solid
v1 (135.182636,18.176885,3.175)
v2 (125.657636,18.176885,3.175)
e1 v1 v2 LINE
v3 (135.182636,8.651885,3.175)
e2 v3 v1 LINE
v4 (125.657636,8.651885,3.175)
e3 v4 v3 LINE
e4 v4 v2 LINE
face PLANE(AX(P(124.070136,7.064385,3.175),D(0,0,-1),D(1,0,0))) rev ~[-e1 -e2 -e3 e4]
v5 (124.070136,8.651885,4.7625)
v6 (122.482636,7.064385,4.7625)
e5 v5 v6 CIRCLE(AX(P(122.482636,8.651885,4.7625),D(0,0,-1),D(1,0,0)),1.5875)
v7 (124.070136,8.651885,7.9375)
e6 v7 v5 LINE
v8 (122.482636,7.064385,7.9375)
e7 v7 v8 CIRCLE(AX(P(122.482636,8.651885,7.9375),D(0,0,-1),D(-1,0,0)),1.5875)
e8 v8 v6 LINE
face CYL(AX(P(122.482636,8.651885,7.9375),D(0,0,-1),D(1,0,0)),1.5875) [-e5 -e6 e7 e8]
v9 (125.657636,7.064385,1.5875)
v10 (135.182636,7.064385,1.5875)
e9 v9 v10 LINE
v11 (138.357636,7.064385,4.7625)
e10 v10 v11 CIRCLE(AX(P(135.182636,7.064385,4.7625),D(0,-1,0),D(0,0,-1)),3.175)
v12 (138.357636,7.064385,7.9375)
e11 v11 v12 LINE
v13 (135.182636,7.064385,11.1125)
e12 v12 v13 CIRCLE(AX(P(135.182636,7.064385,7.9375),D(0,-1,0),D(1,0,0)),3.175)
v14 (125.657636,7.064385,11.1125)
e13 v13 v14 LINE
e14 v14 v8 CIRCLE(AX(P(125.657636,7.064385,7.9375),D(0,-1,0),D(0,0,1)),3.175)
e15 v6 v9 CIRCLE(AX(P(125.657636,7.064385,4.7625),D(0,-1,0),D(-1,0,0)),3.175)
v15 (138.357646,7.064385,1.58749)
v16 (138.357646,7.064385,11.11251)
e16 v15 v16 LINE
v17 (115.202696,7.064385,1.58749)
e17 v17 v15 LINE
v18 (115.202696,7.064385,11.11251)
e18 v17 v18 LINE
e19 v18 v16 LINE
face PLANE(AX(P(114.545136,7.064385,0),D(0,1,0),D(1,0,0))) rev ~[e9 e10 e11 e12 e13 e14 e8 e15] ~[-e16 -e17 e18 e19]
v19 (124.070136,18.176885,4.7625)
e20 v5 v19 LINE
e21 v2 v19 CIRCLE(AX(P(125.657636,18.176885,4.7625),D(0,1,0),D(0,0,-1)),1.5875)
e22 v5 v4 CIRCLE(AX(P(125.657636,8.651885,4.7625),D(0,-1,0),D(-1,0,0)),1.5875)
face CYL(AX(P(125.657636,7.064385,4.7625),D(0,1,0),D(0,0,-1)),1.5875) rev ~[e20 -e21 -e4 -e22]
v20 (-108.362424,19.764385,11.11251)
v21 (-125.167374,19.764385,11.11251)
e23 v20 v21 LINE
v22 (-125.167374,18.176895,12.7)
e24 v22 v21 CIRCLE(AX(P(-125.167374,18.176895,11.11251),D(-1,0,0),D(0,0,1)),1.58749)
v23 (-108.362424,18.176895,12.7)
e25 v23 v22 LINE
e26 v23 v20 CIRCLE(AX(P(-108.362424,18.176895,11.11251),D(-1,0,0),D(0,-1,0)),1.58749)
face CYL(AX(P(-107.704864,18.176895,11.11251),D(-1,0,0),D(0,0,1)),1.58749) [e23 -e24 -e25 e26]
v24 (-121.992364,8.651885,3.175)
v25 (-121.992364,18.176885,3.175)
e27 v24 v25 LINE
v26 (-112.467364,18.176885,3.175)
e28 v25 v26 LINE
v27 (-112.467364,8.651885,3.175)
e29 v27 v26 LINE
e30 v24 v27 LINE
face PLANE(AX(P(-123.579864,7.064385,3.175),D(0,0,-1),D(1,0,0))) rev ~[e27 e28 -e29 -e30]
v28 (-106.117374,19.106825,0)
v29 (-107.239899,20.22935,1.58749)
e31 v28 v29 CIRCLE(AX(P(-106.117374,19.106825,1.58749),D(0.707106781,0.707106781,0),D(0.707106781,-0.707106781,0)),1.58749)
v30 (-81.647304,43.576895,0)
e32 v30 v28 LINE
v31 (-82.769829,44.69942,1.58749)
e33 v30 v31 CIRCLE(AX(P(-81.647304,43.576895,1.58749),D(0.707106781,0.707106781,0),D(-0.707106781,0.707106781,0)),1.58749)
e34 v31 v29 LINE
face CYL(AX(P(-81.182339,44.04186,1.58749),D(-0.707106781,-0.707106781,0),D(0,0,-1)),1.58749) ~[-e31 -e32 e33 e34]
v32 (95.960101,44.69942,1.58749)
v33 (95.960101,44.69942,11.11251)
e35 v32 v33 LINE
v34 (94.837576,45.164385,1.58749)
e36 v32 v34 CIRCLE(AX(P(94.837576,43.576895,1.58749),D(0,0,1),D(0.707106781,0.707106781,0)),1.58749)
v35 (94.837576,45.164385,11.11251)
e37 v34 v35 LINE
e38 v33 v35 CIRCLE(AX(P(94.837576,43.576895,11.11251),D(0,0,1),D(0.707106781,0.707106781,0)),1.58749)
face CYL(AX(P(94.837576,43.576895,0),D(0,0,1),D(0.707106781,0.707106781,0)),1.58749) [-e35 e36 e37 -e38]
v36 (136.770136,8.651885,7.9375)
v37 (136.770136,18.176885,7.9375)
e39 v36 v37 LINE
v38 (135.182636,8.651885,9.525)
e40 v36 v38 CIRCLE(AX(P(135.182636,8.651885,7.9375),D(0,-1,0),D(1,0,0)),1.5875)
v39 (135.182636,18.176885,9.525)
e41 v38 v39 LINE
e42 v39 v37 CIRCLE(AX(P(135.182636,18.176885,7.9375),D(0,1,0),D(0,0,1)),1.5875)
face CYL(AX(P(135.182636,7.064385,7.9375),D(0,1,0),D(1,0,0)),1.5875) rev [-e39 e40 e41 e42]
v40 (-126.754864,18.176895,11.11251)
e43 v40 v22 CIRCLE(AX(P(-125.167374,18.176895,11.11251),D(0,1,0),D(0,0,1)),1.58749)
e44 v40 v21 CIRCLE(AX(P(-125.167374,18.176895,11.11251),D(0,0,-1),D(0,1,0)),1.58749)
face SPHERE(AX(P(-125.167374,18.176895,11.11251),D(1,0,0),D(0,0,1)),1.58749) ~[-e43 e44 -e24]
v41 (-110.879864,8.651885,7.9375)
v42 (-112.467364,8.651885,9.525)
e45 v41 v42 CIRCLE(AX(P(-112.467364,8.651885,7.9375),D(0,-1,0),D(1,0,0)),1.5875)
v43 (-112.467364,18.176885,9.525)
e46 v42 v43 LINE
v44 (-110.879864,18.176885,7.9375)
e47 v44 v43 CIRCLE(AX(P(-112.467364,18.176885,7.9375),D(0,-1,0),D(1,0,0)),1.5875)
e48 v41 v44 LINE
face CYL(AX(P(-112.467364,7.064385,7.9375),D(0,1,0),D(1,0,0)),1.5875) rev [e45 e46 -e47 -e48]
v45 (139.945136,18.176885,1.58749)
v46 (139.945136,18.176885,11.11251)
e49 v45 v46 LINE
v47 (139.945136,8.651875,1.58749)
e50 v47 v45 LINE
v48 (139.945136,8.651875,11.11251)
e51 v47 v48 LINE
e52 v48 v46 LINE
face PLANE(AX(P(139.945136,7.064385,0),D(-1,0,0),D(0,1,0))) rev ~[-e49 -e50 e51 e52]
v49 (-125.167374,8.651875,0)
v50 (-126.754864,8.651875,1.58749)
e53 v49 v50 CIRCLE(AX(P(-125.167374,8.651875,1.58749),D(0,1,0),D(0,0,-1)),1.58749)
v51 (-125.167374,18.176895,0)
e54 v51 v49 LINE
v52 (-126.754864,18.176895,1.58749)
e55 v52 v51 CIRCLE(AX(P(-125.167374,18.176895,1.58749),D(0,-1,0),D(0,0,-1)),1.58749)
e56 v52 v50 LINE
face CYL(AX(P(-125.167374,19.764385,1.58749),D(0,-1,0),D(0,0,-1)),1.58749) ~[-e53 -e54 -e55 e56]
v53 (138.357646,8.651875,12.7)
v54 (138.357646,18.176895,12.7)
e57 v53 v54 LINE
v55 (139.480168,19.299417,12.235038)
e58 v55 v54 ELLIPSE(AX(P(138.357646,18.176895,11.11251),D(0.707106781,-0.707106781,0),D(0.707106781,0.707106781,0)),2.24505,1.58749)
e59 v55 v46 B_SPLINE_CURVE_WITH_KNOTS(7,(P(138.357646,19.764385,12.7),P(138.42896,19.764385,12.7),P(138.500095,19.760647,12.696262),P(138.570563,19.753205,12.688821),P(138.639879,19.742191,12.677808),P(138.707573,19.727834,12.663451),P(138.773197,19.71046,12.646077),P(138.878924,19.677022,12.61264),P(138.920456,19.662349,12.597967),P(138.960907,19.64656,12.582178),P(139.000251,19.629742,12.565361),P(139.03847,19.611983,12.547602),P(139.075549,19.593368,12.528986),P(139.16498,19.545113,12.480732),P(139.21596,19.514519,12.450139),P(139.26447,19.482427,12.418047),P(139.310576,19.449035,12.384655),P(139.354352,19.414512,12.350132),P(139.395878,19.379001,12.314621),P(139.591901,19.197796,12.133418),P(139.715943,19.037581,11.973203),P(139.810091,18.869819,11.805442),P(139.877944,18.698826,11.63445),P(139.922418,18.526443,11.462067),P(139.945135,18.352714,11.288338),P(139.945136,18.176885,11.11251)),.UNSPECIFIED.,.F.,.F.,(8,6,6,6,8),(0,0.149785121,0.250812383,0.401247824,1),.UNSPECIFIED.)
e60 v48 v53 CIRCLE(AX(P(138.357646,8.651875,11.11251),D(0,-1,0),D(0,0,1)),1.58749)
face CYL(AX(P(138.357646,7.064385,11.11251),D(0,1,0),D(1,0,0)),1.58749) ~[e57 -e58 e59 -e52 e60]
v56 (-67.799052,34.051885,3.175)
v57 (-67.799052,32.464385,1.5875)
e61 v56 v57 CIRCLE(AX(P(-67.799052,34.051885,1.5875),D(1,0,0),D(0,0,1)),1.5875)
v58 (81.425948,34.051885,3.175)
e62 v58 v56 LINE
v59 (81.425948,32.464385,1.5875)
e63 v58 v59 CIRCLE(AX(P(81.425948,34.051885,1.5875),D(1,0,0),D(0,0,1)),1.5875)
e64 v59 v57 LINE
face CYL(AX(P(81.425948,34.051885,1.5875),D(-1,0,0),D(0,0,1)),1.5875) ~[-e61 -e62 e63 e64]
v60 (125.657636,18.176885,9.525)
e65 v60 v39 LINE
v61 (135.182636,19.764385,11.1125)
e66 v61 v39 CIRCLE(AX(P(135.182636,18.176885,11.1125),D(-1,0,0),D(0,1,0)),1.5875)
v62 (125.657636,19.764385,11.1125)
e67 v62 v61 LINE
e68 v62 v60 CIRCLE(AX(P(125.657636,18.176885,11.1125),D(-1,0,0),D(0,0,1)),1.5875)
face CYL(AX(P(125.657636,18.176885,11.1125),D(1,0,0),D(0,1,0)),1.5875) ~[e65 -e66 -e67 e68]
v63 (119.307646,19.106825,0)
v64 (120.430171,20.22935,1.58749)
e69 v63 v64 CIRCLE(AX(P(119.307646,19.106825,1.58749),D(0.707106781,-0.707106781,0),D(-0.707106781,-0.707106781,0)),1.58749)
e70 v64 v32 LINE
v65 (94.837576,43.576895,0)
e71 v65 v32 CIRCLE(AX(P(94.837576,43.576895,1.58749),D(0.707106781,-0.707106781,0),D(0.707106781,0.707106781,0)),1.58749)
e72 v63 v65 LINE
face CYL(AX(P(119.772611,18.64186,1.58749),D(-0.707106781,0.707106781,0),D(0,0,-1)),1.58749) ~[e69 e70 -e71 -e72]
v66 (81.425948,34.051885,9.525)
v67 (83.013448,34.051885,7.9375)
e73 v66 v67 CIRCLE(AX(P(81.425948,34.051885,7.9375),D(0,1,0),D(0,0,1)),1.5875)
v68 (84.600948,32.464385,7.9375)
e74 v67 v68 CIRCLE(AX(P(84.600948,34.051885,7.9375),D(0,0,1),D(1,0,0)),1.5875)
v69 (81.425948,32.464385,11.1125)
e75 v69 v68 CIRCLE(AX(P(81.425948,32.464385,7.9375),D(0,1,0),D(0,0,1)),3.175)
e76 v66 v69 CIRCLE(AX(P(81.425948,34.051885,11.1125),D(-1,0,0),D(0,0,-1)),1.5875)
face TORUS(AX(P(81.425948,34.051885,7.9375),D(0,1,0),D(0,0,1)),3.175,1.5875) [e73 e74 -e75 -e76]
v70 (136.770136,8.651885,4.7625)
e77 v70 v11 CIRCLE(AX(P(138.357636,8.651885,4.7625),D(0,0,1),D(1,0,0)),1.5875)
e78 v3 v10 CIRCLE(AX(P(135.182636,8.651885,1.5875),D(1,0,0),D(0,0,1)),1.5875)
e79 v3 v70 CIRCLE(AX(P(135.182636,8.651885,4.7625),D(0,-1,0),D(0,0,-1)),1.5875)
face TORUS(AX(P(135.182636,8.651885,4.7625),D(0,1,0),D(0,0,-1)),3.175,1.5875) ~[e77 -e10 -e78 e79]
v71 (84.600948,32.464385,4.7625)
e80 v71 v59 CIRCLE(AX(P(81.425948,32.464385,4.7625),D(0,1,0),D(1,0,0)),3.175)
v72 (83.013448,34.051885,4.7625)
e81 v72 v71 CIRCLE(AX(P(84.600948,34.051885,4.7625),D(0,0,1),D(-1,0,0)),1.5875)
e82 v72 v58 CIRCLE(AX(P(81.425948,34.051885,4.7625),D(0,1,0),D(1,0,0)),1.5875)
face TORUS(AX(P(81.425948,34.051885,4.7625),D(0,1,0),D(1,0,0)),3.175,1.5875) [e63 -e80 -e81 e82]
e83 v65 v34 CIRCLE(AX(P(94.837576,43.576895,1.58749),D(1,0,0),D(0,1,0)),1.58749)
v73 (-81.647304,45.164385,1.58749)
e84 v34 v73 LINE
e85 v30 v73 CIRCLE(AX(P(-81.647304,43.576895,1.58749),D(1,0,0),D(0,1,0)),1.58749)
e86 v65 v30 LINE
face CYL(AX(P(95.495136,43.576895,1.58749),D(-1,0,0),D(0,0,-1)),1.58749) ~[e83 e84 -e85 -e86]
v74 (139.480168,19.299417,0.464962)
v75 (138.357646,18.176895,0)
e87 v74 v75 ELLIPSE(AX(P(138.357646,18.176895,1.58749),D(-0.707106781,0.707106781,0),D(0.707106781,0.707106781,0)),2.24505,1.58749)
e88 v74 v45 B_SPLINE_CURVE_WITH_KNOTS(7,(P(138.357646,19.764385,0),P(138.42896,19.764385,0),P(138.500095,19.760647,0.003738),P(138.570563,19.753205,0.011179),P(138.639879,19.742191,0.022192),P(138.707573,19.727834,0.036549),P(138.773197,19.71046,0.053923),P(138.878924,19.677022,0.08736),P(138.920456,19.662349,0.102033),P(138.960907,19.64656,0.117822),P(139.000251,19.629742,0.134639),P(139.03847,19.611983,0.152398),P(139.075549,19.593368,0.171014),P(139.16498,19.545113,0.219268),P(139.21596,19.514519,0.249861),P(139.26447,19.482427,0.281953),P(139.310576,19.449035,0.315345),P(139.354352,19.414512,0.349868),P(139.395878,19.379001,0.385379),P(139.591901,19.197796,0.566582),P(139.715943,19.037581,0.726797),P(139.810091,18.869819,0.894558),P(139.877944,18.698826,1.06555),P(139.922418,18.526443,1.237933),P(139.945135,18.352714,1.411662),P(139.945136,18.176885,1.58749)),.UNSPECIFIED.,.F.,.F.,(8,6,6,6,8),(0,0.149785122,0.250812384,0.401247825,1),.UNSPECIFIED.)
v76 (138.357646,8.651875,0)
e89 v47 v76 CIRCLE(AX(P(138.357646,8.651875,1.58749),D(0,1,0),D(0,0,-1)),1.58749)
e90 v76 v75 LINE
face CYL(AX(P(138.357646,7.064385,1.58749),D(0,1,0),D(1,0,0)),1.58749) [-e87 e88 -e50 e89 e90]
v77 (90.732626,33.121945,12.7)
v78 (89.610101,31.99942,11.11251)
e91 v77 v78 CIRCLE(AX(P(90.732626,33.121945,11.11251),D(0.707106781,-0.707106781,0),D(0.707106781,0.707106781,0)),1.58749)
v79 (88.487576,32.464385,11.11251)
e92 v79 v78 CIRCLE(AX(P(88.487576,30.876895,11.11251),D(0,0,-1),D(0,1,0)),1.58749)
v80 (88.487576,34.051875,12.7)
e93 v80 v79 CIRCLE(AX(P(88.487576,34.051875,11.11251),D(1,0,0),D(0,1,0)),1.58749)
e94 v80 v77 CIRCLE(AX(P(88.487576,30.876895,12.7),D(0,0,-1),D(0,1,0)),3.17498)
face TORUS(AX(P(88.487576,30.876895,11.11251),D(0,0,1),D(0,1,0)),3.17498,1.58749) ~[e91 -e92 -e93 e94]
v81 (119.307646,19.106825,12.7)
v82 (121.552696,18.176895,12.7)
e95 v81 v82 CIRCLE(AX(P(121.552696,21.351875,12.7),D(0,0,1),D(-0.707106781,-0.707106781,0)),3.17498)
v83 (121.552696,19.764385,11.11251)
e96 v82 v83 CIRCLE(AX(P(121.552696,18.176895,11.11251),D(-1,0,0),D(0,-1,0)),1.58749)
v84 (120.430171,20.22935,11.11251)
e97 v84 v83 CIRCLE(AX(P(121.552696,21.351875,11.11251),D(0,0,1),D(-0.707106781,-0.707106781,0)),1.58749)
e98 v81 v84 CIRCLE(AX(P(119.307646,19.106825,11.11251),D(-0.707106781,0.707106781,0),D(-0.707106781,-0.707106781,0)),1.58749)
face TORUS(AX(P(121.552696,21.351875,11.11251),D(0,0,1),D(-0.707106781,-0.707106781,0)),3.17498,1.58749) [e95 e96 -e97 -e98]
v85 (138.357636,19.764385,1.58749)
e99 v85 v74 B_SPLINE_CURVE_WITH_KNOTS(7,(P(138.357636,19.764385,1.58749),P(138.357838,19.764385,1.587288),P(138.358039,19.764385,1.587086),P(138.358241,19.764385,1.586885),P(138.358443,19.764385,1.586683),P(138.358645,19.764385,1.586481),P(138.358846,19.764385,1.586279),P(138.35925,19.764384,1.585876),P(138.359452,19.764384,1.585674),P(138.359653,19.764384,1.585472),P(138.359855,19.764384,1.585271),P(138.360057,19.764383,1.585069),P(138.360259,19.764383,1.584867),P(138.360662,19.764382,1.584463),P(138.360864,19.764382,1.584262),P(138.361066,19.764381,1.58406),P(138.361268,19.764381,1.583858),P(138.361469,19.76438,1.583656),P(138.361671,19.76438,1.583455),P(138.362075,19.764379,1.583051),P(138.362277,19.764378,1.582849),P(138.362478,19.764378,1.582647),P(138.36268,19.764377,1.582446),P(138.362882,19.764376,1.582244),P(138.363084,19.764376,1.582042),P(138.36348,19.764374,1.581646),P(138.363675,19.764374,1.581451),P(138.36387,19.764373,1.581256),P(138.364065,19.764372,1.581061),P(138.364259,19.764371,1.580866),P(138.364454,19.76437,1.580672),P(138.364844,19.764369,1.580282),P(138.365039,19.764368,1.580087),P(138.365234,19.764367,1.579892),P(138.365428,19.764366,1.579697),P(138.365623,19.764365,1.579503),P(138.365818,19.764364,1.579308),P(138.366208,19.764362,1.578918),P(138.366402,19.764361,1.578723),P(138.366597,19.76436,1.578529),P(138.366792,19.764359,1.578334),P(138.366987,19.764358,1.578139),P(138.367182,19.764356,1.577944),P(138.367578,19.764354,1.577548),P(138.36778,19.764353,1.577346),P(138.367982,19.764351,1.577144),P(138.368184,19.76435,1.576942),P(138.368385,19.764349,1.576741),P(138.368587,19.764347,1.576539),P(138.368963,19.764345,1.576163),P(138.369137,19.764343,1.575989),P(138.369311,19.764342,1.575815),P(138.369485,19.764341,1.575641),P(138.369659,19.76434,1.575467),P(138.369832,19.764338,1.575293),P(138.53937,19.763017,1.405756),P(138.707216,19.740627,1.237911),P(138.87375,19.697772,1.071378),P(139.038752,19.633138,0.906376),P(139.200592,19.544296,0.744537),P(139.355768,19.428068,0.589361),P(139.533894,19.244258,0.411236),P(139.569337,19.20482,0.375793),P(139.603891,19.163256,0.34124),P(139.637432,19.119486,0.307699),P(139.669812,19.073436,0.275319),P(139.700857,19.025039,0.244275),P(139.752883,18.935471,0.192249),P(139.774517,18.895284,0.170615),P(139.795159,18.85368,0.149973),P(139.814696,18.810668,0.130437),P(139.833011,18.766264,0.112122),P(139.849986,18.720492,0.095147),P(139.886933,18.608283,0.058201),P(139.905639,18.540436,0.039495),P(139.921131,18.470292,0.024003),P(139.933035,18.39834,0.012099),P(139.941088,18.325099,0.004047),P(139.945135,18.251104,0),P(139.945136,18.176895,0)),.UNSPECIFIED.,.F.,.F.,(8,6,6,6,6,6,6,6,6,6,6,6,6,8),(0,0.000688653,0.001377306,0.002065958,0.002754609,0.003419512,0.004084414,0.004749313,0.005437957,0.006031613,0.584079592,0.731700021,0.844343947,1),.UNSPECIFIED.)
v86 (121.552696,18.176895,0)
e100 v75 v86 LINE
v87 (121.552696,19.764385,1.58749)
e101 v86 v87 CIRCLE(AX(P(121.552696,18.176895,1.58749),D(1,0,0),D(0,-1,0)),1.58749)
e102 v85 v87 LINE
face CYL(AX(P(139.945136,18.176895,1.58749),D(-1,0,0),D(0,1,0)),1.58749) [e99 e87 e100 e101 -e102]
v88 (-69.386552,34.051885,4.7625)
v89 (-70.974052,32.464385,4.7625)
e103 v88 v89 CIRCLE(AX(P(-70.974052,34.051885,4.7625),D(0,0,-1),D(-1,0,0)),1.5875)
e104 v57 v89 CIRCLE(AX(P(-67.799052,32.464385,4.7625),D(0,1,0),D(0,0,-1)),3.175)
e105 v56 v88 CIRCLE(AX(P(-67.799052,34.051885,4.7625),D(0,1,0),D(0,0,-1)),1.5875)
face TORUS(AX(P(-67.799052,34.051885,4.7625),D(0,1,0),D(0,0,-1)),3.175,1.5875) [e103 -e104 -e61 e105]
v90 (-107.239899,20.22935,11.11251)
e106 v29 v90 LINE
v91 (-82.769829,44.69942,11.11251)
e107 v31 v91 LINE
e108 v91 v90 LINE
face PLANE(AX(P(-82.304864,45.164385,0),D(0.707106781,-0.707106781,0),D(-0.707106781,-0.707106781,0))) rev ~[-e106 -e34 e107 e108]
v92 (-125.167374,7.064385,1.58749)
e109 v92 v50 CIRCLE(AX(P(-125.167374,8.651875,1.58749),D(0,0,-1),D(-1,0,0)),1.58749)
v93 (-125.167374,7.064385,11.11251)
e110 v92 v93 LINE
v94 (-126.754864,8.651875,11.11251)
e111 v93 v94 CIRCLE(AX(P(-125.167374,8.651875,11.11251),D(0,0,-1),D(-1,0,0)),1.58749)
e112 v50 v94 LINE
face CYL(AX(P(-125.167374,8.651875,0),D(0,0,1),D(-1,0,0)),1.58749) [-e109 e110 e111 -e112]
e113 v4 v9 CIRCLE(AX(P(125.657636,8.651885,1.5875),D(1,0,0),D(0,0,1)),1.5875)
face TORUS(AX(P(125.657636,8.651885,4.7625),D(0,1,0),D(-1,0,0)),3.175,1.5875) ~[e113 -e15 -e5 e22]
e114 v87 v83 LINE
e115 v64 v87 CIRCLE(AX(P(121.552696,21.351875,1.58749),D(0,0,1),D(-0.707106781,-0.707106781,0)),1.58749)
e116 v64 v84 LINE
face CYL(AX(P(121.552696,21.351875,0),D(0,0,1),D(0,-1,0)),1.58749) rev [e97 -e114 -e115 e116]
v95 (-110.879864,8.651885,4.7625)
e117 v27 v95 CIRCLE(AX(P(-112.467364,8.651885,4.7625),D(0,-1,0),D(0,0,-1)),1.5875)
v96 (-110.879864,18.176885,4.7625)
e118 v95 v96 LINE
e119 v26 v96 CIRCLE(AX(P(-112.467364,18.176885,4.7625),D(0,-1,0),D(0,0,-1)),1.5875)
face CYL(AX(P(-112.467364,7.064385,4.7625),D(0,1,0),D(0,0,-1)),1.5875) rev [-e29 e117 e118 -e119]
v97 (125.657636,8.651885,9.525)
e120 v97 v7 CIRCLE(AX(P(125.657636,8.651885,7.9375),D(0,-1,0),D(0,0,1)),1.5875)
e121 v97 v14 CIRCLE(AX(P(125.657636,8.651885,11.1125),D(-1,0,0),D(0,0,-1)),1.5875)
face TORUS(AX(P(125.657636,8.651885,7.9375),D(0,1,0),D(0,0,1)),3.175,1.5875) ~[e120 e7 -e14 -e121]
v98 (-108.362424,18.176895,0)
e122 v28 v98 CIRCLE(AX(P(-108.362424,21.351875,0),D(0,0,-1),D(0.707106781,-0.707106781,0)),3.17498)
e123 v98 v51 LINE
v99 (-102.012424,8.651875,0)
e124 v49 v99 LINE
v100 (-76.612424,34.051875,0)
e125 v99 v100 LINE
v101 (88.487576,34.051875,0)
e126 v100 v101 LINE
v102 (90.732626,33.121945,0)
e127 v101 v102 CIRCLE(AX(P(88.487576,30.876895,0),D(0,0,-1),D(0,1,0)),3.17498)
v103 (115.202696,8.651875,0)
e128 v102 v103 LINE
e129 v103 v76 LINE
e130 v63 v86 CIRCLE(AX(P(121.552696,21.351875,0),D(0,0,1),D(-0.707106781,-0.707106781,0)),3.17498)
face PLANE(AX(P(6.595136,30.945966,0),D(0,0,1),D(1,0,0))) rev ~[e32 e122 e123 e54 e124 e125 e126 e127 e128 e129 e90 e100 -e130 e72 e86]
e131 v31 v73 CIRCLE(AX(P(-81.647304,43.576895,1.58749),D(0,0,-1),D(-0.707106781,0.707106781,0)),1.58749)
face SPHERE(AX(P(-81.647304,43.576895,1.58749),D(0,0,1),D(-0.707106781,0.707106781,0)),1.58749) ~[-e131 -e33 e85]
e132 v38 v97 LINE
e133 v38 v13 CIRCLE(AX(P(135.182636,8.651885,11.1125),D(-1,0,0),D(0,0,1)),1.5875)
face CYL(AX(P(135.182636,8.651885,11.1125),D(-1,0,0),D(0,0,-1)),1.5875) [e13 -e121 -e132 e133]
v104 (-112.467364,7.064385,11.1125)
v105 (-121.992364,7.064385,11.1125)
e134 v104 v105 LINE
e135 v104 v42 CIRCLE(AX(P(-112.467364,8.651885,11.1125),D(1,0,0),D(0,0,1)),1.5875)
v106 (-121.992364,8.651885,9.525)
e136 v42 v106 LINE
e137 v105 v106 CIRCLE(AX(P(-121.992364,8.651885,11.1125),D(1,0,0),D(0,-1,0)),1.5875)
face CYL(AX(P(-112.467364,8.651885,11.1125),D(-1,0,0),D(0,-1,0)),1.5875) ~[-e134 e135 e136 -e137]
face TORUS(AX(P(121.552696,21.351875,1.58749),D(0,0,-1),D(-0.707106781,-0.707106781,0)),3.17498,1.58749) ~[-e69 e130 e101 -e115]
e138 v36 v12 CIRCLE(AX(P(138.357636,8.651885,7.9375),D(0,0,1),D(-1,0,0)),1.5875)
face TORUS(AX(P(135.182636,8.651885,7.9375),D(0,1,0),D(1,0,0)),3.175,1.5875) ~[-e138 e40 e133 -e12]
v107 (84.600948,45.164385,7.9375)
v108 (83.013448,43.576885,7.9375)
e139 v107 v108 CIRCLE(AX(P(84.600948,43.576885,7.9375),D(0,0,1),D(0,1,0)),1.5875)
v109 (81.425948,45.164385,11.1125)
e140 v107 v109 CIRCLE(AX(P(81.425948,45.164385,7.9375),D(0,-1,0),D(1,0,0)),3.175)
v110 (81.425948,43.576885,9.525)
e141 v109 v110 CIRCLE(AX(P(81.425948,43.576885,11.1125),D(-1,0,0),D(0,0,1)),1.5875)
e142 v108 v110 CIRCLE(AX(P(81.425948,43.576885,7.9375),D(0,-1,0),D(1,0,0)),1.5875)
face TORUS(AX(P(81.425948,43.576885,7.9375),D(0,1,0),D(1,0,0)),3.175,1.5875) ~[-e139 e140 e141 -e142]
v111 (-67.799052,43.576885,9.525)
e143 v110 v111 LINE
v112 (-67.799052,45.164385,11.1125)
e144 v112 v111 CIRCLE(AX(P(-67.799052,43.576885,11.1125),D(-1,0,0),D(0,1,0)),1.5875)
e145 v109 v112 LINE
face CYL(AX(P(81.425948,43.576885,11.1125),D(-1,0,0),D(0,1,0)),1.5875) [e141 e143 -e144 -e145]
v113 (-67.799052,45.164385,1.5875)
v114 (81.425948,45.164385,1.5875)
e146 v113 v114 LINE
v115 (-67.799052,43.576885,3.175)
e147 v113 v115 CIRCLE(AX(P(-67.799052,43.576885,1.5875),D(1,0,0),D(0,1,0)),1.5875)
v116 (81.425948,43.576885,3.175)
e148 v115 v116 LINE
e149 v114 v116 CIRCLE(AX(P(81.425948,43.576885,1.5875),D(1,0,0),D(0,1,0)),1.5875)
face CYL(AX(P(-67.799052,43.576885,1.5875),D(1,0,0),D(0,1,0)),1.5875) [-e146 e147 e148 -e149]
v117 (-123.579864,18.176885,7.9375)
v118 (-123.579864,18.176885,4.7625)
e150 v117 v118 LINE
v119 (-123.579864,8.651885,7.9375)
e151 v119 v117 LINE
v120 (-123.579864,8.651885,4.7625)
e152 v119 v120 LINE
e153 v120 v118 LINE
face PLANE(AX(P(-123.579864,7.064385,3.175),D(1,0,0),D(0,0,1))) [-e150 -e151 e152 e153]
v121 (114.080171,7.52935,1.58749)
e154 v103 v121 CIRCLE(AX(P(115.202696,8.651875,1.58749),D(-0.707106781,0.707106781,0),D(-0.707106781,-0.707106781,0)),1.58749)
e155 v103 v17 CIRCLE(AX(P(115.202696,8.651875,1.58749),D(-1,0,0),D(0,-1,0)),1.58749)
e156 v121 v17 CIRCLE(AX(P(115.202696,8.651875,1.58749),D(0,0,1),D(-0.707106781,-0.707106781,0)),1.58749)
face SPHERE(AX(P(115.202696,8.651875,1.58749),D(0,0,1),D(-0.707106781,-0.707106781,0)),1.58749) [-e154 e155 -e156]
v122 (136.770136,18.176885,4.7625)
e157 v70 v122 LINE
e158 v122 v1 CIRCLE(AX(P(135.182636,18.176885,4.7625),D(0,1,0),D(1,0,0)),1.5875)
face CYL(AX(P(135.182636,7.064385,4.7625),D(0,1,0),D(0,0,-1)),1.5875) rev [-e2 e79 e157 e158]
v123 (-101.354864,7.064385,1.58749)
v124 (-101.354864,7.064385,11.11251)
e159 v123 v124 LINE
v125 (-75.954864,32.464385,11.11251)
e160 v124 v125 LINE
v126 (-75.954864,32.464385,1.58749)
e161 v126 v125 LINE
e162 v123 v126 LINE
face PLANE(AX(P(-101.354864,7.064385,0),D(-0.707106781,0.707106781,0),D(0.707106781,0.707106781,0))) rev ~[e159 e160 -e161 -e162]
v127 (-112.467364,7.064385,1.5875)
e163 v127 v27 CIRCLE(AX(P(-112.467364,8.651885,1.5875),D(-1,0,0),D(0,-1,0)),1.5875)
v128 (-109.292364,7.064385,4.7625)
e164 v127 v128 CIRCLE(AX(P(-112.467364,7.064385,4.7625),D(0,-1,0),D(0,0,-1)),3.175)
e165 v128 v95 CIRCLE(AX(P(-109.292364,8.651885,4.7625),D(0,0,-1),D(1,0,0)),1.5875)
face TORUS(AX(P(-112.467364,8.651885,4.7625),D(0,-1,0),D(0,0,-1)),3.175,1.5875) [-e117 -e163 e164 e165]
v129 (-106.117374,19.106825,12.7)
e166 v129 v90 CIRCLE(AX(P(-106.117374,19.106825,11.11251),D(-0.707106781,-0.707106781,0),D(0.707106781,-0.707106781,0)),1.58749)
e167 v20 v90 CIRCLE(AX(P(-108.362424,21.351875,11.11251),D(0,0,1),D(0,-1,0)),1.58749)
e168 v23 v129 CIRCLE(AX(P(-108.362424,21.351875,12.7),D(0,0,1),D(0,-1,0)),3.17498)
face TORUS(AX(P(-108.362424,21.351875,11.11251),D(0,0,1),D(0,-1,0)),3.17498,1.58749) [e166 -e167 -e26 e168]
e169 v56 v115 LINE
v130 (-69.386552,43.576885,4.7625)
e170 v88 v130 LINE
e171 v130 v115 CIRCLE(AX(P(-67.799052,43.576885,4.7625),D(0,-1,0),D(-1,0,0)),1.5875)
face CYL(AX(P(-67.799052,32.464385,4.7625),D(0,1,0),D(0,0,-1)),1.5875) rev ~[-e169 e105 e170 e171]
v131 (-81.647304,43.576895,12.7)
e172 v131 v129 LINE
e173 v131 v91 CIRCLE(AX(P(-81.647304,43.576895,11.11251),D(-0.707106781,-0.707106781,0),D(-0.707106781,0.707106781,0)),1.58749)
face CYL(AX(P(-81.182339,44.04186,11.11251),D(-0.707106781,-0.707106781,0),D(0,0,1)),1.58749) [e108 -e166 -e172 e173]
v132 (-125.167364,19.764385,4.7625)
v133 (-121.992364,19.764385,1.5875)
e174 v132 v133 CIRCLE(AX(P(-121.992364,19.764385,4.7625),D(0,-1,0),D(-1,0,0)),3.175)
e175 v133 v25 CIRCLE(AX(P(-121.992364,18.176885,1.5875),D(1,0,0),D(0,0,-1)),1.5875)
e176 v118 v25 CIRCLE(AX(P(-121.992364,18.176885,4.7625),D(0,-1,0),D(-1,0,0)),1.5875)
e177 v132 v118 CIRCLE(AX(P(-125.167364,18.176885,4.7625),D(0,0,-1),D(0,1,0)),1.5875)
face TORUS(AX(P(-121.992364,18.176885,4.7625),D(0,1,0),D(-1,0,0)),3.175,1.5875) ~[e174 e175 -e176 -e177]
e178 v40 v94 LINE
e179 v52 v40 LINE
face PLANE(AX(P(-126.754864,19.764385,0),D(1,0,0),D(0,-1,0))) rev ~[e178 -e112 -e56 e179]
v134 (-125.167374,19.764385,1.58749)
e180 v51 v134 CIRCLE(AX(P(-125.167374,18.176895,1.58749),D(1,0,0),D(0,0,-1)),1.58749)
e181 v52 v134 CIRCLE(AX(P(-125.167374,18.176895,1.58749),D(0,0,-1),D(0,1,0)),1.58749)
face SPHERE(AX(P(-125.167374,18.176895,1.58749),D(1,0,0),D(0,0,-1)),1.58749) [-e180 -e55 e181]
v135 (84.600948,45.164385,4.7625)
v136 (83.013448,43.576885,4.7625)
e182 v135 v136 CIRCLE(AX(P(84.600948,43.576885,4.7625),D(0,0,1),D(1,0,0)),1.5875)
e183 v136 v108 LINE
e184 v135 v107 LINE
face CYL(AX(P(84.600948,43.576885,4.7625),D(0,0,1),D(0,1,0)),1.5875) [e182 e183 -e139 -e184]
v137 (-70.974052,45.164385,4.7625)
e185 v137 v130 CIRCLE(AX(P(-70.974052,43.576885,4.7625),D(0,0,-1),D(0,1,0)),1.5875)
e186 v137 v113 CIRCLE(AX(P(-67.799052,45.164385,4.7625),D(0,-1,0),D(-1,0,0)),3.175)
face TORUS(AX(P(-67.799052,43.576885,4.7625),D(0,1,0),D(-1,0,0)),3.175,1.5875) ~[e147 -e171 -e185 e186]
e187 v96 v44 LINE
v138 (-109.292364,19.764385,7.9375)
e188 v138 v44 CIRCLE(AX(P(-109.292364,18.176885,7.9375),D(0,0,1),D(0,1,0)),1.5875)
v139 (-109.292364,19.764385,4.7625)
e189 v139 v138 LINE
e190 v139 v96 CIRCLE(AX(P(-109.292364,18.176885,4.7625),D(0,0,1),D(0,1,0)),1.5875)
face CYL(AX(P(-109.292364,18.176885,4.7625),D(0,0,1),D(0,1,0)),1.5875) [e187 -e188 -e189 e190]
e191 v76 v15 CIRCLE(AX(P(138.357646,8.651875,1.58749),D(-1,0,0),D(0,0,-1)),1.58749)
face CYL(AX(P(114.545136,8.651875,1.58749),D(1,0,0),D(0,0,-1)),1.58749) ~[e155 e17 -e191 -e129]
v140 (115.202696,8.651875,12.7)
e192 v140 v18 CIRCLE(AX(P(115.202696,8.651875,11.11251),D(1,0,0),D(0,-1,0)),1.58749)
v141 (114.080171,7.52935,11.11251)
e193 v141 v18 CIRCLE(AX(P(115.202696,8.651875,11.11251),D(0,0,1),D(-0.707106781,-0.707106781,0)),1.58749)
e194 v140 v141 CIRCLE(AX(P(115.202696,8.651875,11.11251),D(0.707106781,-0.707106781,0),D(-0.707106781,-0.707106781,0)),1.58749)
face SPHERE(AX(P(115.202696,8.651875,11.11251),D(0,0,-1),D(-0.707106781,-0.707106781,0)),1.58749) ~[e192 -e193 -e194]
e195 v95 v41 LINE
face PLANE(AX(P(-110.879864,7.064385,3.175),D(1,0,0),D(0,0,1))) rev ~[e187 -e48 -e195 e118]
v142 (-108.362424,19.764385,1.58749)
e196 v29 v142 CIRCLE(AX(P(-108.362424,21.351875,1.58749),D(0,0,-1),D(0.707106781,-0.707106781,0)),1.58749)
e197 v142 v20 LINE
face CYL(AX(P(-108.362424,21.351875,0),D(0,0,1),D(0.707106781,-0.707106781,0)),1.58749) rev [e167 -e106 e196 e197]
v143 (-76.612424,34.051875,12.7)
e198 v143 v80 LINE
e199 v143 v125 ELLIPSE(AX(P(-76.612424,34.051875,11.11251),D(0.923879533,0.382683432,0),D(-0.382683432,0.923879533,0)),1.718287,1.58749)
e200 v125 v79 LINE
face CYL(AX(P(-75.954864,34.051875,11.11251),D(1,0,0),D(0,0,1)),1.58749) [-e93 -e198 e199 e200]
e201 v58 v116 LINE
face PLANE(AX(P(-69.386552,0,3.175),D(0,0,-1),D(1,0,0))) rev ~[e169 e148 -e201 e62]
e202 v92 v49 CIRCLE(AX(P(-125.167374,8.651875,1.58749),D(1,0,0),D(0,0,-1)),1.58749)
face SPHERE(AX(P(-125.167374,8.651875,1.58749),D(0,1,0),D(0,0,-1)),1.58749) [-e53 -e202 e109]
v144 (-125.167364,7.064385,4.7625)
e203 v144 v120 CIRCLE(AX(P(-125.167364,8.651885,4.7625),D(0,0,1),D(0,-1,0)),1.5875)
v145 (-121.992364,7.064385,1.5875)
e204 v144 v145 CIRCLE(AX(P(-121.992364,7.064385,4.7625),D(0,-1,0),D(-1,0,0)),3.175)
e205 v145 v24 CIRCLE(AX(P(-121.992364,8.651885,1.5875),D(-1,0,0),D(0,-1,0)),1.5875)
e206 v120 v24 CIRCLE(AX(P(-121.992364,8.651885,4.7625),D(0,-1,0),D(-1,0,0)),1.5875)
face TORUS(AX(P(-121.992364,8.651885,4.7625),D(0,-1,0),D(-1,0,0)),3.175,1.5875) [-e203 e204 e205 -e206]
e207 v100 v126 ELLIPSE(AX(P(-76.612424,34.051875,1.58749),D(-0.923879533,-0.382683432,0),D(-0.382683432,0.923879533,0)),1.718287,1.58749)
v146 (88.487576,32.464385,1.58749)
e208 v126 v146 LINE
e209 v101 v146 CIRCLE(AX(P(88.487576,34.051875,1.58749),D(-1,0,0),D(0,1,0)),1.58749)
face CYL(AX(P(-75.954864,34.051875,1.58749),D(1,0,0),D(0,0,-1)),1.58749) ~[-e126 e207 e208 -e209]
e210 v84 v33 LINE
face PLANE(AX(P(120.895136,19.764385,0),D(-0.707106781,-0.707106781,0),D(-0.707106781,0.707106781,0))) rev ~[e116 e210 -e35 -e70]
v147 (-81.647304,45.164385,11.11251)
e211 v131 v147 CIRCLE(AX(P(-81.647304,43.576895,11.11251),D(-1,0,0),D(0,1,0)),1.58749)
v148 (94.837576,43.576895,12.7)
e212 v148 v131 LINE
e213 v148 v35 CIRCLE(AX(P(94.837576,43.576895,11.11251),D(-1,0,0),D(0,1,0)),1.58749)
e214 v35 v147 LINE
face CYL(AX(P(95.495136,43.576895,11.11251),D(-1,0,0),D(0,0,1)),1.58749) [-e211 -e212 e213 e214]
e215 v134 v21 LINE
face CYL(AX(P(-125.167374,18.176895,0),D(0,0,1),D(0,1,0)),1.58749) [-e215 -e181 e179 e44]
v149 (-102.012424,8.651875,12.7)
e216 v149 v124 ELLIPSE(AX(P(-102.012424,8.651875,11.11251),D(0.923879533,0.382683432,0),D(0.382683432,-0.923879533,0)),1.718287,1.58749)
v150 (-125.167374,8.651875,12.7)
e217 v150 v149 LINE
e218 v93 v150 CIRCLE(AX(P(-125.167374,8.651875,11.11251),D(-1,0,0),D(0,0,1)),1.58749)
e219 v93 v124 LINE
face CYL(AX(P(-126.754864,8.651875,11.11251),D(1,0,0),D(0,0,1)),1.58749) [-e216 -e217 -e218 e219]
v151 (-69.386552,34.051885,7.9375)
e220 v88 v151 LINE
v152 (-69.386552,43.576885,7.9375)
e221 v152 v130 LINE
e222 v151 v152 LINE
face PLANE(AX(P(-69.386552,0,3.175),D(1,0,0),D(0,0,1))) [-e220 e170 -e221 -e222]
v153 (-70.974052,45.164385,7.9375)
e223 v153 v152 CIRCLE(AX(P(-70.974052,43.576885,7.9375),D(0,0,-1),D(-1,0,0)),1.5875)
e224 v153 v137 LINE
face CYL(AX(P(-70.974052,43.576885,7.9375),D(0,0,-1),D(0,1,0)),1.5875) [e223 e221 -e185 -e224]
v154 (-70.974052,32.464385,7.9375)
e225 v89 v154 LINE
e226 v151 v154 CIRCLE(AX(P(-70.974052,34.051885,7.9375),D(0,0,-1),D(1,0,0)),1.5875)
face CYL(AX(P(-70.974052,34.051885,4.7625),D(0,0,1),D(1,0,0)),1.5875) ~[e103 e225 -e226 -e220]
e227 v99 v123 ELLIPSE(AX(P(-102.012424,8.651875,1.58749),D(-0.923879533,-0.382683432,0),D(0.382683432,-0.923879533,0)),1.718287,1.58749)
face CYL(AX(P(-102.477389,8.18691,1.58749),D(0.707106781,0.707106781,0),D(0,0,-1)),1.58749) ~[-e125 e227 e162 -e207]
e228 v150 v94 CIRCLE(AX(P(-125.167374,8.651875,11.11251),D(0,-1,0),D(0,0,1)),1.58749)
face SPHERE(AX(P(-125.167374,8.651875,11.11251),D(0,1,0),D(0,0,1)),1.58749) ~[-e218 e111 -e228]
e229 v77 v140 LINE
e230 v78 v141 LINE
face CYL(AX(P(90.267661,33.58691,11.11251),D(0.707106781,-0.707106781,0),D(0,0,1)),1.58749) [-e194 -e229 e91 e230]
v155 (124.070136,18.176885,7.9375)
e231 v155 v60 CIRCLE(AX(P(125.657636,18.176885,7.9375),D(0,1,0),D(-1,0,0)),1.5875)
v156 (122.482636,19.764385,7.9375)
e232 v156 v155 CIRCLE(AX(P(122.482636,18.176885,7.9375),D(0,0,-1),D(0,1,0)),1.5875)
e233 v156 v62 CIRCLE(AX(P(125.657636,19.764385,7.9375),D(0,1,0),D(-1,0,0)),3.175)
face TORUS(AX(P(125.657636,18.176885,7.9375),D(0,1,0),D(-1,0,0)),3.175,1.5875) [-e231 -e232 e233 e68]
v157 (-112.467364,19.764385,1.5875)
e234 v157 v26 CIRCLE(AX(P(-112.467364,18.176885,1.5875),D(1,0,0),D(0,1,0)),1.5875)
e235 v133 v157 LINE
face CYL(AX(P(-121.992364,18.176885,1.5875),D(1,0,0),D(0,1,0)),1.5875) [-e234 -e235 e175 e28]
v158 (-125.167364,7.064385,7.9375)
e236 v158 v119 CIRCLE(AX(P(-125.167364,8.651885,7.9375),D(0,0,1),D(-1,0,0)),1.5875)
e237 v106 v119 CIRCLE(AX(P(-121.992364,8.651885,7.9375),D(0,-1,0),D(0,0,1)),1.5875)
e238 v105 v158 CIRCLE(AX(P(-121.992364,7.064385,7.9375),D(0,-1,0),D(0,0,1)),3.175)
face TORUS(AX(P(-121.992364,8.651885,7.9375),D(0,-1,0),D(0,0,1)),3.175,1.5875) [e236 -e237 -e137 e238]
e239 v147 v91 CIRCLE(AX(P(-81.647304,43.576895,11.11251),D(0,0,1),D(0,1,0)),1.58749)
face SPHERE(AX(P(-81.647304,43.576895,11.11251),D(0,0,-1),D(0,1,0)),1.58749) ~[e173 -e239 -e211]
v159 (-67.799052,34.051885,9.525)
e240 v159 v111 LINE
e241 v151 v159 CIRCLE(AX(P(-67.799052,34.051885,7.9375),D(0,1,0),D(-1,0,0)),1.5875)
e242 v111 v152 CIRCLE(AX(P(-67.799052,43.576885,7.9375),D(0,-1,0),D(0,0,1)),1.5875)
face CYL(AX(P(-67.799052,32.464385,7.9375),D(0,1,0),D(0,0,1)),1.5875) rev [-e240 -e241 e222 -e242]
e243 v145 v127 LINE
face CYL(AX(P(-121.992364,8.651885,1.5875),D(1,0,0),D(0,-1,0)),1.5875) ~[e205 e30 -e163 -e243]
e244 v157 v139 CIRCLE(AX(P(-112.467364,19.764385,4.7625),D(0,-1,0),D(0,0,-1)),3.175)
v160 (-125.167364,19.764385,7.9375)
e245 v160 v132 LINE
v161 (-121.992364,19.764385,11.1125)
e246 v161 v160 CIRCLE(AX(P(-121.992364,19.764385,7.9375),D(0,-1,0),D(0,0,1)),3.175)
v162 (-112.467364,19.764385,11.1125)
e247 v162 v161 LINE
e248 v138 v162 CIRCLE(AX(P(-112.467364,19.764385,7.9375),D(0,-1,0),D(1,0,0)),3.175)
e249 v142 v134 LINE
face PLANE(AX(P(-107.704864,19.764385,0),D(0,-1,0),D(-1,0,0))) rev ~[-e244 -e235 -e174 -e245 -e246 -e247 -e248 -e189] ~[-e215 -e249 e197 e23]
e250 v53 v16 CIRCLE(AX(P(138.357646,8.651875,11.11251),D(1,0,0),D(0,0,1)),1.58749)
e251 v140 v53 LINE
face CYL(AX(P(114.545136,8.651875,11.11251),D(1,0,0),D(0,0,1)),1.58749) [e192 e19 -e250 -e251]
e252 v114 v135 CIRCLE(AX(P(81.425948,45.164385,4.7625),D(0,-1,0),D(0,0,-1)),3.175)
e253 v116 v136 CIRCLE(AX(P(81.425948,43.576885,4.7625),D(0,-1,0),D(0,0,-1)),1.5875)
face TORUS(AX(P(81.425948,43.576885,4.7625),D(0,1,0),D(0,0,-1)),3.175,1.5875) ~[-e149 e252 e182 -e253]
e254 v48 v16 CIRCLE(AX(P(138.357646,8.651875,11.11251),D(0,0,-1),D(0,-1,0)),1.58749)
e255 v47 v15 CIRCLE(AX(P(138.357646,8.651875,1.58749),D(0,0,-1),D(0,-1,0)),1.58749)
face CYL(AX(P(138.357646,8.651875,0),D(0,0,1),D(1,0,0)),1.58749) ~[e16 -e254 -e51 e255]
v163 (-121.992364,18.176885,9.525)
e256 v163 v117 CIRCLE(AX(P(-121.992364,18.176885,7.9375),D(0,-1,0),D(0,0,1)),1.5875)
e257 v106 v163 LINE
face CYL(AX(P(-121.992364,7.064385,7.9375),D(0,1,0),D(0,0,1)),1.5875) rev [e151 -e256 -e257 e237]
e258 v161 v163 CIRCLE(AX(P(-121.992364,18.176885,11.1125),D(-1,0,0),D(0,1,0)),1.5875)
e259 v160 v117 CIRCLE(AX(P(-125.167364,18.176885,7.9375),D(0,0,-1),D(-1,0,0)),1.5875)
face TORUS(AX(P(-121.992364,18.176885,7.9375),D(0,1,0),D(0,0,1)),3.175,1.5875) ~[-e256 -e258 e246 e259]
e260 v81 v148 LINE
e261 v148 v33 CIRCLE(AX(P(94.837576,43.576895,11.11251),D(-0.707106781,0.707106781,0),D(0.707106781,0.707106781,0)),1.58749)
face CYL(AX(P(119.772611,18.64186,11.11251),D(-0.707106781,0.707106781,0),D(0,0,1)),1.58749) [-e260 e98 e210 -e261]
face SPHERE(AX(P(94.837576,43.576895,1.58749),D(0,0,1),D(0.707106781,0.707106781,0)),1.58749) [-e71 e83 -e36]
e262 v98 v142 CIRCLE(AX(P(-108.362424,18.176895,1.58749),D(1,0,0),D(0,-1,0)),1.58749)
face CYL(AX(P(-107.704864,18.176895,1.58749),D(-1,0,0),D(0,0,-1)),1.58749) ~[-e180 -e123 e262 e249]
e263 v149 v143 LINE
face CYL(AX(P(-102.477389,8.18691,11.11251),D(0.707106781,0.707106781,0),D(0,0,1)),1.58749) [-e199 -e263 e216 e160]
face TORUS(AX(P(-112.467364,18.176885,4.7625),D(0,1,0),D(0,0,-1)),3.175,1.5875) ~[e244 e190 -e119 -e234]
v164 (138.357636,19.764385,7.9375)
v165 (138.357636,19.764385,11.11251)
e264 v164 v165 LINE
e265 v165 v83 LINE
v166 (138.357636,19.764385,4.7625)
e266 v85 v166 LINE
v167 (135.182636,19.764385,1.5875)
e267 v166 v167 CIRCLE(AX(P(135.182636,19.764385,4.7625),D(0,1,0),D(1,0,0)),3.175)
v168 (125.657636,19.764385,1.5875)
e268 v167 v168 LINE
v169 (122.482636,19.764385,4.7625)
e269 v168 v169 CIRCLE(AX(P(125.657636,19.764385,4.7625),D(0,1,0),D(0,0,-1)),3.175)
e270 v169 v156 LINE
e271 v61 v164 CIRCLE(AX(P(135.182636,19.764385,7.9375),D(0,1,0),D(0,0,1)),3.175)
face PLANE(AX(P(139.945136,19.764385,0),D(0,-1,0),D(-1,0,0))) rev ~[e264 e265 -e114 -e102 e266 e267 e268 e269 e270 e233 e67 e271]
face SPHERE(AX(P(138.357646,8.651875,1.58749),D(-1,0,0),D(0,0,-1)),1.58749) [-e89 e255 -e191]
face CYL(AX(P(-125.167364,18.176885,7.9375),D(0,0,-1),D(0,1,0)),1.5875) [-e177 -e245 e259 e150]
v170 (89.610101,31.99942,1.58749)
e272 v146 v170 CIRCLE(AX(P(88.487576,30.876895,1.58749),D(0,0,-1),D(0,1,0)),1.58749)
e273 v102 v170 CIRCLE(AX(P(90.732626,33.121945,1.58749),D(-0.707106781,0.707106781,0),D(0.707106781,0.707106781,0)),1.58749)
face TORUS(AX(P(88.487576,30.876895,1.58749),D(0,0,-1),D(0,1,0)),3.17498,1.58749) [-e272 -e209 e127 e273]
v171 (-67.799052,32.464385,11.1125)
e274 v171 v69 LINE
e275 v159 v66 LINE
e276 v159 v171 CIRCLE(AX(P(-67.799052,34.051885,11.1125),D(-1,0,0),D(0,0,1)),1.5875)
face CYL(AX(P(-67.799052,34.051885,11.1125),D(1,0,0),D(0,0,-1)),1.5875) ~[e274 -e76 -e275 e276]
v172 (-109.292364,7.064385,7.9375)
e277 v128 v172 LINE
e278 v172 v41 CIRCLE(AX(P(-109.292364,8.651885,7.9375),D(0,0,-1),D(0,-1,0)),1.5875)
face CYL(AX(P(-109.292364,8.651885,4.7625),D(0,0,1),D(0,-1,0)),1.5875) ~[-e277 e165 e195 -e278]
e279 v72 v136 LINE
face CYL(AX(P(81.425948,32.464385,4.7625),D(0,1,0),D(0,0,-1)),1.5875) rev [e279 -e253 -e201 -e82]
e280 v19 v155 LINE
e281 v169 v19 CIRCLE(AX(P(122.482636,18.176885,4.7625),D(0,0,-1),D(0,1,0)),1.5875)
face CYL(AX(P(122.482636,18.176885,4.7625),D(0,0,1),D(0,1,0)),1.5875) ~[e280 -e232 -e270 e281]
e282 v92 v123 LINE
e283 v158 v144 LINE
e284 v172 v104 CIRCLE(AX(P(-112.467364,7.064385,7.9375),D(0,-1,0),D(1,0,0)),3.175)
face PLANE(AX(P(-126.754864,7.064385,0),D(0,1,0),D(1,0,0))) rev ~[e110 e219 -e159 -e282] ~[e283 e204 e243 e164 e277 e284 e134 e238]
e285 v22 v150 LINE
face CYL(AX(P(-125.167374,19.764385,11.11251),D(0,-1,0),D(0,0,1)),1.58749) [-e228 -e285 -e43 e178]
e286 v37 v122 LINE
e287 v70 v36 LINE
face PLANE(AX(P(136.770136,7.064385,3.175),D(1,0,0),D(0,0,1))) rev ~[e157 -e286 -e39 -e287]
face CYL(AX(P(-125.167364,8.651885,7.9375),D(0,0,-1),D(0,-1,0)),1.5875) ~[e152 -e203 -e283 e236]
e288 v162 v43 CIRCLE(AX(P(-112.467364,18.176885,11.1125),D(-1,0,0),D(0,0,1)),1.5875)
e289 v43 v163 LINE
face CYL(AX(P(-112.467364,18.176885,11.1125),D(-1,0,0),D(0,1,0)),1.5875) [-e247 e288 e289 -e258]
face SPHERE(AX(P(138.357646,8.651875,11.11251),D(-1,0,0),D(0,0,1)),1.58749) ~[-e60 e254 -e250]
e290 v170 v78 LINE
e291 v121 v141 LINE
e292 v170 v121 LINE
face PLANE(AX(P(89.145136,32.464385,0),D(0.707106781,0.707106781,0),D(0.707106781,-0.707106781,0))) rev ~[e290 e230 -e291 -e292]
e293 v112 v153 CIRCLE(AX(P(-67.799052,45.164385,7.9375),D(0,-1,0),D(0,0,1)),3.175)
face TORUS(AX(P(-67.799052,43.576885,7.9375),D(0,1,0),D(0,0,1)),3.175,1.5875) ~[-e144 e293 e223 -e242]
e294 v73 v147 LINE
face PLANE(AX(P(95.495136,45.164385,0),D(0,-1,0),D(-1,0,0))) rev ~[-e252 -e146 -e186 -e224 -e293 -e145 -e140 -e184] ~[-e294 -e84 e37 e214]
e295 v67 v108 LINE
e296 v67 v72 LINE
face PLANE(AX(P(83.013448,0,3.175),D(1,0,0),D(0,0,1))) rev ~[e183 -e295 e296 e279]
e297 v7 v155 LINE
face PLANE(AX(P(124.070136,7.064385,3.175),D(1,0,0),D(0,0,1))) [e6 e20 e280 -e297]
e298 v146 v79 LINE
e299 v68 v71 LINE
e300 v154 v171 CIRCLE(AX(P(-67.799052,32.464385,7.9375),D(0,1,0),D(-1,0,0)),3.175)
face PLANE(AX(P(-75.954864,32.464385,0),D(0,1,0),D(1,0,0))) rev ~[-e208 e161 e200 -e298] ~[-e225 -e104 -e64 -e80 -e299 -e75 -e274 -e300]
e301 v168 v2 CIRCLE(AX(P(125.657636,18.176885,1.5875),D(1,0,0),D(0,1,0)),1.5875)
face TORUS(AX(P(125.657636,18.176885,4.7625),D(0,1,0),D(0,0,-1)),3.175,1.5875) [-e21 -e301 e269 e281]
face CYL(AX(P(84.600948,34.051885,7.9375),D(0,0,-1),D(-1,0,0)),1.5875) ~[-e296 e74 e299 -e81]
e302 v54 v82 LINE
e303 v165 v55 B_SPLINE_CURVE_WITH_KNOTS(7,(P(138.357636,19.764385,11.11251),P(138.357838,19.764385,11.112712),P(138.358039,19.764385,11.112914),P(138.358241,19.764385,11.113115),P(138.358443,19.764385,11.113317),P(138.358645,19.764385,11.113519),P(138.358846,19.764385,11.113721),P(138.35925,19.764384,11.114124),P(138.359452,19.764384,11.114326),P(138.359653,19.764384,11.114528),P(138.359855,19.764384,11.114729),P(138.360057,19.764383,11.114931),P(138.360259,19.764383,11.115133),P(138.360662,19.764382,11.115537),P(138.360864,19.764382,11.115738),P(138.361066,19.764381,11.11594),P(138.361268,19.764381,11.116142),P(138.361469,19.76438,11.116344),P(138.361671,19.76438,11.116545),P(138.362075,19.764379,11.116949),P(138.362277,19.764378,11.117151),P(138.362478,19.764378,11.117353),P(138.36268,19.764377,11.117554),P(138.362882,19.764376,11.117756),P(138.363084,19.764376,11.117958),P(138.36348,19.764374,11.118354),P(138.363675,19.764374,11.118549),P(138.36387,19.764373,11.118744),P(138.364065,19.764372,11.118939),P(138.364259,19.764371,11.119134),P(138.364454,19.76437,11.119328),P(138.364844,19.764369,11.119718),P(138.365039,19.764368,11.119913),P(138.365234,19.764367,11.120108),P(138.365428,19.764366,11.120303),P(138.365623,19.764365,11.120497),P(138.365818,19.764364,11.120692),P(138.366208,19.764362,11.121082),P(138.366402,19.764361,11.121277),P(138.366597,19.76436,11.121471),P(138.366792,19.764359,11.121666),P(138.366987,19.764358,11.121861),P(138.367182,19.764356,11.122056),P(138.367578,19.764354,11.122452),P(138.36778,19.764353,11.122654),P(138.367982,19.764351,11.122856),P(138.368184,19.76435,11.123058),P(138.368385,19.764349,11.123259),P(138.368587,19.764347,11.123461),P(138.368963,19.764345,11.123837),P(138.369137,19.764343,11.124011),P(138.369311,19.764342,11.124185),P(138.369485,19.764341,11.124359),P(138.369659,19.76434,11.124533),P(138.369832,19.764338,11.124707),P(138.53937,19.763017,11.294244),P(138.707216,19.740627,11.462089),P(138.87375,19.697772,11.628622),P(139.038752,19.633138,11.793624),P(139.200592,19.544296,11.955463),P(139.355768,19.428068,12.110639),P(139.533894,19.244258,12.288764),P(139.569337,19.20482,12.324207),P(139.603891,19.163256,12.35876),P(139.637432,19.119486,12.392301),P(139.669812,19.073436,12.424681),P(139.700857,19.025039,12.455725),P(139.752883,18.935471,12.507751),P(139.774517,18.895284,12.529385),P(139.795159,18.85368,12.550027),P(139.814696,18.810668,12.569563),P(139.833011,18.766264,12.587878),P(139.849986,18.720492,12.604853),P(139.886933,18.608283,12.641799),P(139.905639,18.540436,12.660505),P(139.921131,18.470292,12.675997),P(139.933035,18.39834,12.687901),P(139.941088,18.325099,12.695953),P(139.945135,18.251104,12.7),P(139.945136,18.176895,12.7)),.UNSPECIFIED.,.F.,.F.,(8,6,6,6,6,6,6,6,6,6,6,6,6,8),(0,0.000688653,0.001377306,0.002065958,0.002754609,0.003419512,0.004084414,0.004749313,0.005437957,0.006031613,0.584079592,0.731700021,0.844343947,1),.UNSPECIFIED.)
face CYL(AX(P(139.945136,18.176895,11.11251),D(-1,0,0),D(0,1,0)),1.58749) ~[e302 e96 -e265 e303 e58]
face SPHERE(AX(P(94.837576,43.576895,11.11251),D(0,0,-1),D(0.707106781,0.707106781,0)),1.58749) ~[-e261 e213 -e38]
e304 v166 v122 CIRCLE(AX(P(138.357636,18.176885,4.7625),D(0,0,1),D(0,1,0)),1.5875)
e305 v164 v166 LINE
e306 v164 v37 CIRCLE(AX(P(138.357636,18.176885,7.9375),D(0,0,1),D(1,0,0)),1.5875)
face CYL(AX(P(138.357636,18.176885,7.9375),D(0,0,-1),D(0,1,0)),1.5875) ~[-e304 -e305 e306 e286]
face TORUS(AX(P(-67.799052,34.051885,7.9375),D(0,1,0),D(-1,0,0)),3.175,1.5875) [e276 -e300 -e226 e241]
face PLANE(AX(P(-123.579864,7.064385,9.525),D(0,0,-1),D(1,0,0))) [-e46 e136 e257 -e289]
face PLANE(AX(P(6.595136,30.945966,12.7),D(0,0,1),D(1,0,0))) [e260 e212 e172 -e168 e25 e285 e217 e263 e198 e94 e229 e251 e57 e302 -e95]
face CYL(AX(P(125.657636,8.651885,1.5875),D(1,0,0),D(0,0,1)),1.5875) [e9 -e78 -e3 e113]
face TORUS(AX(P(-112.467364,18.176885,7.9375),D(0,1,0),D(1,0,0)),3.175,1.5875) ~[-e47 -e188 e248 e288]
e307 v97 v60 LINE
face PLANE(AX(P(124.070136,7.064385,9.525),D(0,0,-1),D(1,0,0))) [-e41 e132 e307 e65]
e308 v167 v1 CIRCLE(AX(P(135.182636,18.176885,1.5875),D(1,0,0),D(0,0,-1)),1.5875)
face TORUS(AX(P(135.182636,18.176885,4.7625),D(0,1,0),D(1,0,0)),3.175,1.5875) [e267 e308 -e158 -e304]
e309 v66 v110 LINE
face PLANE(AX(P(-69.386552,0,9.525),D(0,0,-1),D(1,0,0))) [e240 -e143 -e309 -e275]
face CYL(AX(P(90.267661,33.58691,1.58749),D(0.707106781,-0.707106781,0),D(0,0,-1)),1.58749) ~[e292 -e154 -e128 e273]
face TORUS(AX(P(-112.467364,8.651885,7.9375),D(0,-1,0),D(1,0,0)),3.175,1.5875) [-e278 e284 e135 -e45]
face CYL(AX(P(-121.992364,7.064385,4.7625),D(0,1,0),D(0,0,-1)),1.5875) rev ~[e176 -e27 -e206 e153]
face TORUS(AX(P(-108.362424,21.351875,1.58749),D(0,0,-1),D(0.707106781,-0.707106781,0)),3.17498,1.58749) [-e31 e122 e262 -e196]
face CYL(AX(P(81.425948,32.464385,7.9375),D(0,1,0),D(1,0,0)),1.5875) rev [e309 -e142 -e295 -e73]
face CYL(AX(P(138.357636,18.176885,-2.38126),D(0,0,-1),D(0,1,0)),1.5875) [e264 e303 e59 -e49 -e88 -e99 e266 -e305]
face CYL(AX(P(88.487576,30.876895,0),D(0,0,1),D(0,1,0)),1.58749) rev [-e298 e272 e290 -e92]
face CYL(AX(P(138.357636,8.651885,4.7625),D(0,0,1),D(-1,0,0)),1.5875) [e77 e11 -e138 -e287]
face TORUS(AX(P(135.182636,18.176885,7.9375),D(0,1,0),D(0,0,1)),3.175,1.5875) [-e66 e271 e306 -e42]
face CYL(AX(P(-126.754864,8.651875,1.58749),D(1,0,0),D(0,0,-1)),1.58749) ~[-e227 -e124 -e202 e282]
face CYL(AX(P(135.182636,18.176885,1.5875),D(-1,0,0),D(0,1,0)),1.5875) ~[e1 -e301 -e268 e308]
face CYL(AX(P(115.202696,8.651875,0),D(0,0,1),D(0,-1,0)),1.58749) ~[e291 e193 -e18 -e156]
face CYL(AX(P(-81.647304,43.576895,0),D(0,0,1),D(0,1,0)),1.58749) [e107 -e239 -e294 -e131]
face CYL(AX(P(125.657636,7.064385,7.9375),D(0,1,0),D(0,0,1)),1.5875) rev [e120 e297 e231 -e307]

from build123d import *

# Parameters (mm, degrees)
F1_DEPTH    = 12.7
F2_W        = 152.4
F2_H        = 6.35
F3_DEPTH    = 45.1653850895
F4_F1_R     = 1.5875
F4_F2_R     = 1.5875
F5_W        = 12.7
F5_H        = 6.35
F6_DEPTH    = 38.101
F7_F1_R     = 1.5875
F7_F2_R     = 1.5875
F8_R        = 1.58749
F9_T1_DEPTH = 17.46252


# Not quite as in the source:
# - a fillet or chamfer that OpenCascade refuses, or shapes differently, is made with other operations: its cross-section is extruded or revolved along the edge and cut away or added
# - a fillet or chamfer is up to 0.001 mm smaller than in the source, because OpenCascade refuses the exact size


with BuildPart() as f1:
    # F0 (on Top) → F1 (new body)
    with BuildSketch(Plane.XY):
        Polygon((95.495135763, 45.1643850895), (-82.304864237, 45.1643850895), (-107.704864237, 19.7643850895), (-126.754864237, 19.7643850895), (-126.754864237, 7.0643850895), (-101.354864237, 7.0643850895), (-75.954864237, 32.4643850895), (89.145135763, 32.4643850895), (114.545135763, 7.0643850895), (139.945135763, 7.0643850895), (139.945135763, 19.7643850895), (120.895135763, 19.7643850895), align=None)
    extrude(amount=F1_DEPTH)

    # F2 (on Front) → F3 (cut, through all)
    with BuildSketch(Plane.XZ):
        with Locations((6.8134479225, 6.35)):
            Rectangle(F2_W, F2_H)
    extrude(amount=-F3_DEPTH, mode=Mode.SUBTRACT)

    # F4: fillet of radius 1.5875 on 6 edges, made by hand

    # F4_f1
    f4_f1_edges = [f1.edges().sort_by_distance(p)[0] for p in [
        (-69.3865520775, 38.8143850895, 3.175),
        (-69.3865520775, 38.8143850895, 9.525),
        (83.0134479225, 38.8143850895, 3.175),
        (83.0134479225, 38.8143850895, 9.525),
    ]]
    fillet(f4_f1_edges, radius=F4_F1_R)

    # F4_f2
    f4_f2_edges = [f1.edges().sort_by_distance(p)[0] for p in [
        (6.8134479225, 32.4643850895, 3.175),
        (6.8134479225, 45.1643850895, 3.175),
        (-68.9215840927, 45.1643850895, 3.6399679849),
        (82.5484799376, 45.1643850895, 3.6399679849),
        (82.5484799376, 32.4643850895, 3.6399679849),
        (-68.9215840927, 32.4643850895, 3.6399679849),
    ]]
    fillet(f4_f2_edges, radius=F4_F2_R)

    # F5 (on face) → F6 (cut, through all)
    with BuildSketch(Plane.XZ.offset(-7.0643850895)):
        with Locations((-117.229864237, 6.3499999233)):
            Rectangle(F5_W, F5_H)
        with Locations((130.420135763, 6.3499999233)):
            Rectangle(F5_W, F5_H)
    extrude(amount=-F6_DEPTH, mode=Mode.SUBTRACT)

    # F7: fillet of radius 1.5875 on 12 edges, made by hand

    # F7_f1
    f7_f1_edges = [f1.edges().sort_by_distance(p)[0] for p in [
        (-123.579864237, 13.4143850895, 9.5249999233),
        (-123.579864237, 13.4143850895, 3.1749999233),
        (-110.879864237, 13.4143850895, 3.1749999233),
        (-110.879864237, 13.4143850895, 9.5249999233),
        (124.070135763, 13.4143850895, 3.1749999233),
        (124.070135763, 13.4143850895, 9.5249999233),
        (136.770135763, 13.4143850895, 9.5249999233),
        (136.770135763, 13.4143850895, 3.1749999233),
    ]]
    fillet(f7_f1_edges, radius=F7_F1_R)

    # F7_f2
    f7_f2_edges = [f1.edges().sort_by_distance(p)[0] for p in [
        (-117.229864237, 7.0643850895, 3.1749999233),
        (130.420135763, 7.0643850895, 3.1749999233),
        (-110.879864237, 19.7643850895, 6.3499999233),
        (124.070135763, 19.7643850895, 6.3499999233),
        (124.5351037479, 19.7643850895, 9.0600319384),
        (124.5351037479, 19.7643850895, 3.6399679081),
        (-111.3448322218, 19.7643850895, 3.6399679081),
        (-111.3448322218, 19.7643850895, 9.0600319384),
        (124.5351037479, 7.0643850895, 3.6399679081),
        (136.3051677782, 7.0643850895, 3.6399679081),
        (-123.1148962521, 7.0643850895, 3.6399679081),
        (-111.3448322218, 7.0643850895, 3.6399679081),
    ]]
    fillet(f7_f2_edges, radius=F7_F2_R)

    # F8 (radius 1.5875 in the source; OpenCascade refuses exactly that, so slightly less here)
    f8_edges = [f1.edges().sort_by_distance(p)[0] for p in [
        (6.595136, 45.164385, 12.7),
        (6.595136, 45.164385, 0),
        (-95.004864, 32.464385, 12.7),
        (-82.304864, 45.164385, 6.35),
        (-107.704864, 19.764385, 6.35),
        (-95.004864, 32.464385, 0),
        (120.895136, 19.764385, 6.35),
        (95.495136, 45.164385, 6.35),
        (108.195136, 32.464385, 0),
        (108.195136, 32.464385, 12.7),
        (-117.229864, 19.764385, 12.7),
        (-126.754864, 13.414385, 12.7),
        (-114.054864, 7.064385, 12.7),
        (-88.654864, 19.764385, 12.7),
        (6.595136, 32.464385, 12.7),
        (101.845136, 19.764385, 12.7),
        (127.245136, 7.064385, 12.7),
        (139.945136, 13.414385, 12.7),
        (130.420136, 19.764385, 12.7),
        (-117.229864, 19.764385, 0),
        (-126.754864, 13.414385, 0),
        (-114.054864, 7.064385, 0),
        (-88.654864, 19.764385, 0),
        (6.595136, 32.464385, 0),
        (101.845136, 19.764385, 0),
        (127.245136, 7.064385, 0),
        (139.945136, 13.414385, 0),
        (130.420136, 19.764385, 0),
        (130.420136, 7.064385, 1.5875),
        (123.412572, 7.064385, 2.517436),
        (137.4277, 7.064385, 2.517436),
        (122.482636, 7.064385, 6.35),
        (138.357636, 7.064385, 6.35),
        (123.412572, 7.064385, 10.182564),
        (137.4277, 7.064385, 10.182564),
        (130.420136, 7.064385, 11.1125),
        (114.545136, 7.064385, 6.35),
        (139.945136, 7.064385, 6.35),
        (89.145136, 32.464385, 6.35),
        (-126.754864, 19.764385, 6.35),
        (-126.754864, 7.064385, 6.35),
    ]]
    fillet(f8_edges, radius=F8_R)

    # F9: fillet of radius 1.5875 on 4 edges, made by hand

    # F9_s2 → F9_t1 (cut)
    with BuildSketch(Plane.XY.offset(-2.38126)):
        with BuildLine():
            ThreePointArc((138.357635763, 19.7643850895), (139.4801677782, 19.2994171047), (139.945135763, 18.1768850895))
            Line((139.945135763, 18.1768850895), (139.945135763, 19.7643850895))
            Line((139.945135763, 19.7643850895), (138.357635763, 19.7643850895))
        make_face()
    extrude(amount=F9_T1_DEPTH, mode=Mode.SUBTRACT)


solid = f1.part
